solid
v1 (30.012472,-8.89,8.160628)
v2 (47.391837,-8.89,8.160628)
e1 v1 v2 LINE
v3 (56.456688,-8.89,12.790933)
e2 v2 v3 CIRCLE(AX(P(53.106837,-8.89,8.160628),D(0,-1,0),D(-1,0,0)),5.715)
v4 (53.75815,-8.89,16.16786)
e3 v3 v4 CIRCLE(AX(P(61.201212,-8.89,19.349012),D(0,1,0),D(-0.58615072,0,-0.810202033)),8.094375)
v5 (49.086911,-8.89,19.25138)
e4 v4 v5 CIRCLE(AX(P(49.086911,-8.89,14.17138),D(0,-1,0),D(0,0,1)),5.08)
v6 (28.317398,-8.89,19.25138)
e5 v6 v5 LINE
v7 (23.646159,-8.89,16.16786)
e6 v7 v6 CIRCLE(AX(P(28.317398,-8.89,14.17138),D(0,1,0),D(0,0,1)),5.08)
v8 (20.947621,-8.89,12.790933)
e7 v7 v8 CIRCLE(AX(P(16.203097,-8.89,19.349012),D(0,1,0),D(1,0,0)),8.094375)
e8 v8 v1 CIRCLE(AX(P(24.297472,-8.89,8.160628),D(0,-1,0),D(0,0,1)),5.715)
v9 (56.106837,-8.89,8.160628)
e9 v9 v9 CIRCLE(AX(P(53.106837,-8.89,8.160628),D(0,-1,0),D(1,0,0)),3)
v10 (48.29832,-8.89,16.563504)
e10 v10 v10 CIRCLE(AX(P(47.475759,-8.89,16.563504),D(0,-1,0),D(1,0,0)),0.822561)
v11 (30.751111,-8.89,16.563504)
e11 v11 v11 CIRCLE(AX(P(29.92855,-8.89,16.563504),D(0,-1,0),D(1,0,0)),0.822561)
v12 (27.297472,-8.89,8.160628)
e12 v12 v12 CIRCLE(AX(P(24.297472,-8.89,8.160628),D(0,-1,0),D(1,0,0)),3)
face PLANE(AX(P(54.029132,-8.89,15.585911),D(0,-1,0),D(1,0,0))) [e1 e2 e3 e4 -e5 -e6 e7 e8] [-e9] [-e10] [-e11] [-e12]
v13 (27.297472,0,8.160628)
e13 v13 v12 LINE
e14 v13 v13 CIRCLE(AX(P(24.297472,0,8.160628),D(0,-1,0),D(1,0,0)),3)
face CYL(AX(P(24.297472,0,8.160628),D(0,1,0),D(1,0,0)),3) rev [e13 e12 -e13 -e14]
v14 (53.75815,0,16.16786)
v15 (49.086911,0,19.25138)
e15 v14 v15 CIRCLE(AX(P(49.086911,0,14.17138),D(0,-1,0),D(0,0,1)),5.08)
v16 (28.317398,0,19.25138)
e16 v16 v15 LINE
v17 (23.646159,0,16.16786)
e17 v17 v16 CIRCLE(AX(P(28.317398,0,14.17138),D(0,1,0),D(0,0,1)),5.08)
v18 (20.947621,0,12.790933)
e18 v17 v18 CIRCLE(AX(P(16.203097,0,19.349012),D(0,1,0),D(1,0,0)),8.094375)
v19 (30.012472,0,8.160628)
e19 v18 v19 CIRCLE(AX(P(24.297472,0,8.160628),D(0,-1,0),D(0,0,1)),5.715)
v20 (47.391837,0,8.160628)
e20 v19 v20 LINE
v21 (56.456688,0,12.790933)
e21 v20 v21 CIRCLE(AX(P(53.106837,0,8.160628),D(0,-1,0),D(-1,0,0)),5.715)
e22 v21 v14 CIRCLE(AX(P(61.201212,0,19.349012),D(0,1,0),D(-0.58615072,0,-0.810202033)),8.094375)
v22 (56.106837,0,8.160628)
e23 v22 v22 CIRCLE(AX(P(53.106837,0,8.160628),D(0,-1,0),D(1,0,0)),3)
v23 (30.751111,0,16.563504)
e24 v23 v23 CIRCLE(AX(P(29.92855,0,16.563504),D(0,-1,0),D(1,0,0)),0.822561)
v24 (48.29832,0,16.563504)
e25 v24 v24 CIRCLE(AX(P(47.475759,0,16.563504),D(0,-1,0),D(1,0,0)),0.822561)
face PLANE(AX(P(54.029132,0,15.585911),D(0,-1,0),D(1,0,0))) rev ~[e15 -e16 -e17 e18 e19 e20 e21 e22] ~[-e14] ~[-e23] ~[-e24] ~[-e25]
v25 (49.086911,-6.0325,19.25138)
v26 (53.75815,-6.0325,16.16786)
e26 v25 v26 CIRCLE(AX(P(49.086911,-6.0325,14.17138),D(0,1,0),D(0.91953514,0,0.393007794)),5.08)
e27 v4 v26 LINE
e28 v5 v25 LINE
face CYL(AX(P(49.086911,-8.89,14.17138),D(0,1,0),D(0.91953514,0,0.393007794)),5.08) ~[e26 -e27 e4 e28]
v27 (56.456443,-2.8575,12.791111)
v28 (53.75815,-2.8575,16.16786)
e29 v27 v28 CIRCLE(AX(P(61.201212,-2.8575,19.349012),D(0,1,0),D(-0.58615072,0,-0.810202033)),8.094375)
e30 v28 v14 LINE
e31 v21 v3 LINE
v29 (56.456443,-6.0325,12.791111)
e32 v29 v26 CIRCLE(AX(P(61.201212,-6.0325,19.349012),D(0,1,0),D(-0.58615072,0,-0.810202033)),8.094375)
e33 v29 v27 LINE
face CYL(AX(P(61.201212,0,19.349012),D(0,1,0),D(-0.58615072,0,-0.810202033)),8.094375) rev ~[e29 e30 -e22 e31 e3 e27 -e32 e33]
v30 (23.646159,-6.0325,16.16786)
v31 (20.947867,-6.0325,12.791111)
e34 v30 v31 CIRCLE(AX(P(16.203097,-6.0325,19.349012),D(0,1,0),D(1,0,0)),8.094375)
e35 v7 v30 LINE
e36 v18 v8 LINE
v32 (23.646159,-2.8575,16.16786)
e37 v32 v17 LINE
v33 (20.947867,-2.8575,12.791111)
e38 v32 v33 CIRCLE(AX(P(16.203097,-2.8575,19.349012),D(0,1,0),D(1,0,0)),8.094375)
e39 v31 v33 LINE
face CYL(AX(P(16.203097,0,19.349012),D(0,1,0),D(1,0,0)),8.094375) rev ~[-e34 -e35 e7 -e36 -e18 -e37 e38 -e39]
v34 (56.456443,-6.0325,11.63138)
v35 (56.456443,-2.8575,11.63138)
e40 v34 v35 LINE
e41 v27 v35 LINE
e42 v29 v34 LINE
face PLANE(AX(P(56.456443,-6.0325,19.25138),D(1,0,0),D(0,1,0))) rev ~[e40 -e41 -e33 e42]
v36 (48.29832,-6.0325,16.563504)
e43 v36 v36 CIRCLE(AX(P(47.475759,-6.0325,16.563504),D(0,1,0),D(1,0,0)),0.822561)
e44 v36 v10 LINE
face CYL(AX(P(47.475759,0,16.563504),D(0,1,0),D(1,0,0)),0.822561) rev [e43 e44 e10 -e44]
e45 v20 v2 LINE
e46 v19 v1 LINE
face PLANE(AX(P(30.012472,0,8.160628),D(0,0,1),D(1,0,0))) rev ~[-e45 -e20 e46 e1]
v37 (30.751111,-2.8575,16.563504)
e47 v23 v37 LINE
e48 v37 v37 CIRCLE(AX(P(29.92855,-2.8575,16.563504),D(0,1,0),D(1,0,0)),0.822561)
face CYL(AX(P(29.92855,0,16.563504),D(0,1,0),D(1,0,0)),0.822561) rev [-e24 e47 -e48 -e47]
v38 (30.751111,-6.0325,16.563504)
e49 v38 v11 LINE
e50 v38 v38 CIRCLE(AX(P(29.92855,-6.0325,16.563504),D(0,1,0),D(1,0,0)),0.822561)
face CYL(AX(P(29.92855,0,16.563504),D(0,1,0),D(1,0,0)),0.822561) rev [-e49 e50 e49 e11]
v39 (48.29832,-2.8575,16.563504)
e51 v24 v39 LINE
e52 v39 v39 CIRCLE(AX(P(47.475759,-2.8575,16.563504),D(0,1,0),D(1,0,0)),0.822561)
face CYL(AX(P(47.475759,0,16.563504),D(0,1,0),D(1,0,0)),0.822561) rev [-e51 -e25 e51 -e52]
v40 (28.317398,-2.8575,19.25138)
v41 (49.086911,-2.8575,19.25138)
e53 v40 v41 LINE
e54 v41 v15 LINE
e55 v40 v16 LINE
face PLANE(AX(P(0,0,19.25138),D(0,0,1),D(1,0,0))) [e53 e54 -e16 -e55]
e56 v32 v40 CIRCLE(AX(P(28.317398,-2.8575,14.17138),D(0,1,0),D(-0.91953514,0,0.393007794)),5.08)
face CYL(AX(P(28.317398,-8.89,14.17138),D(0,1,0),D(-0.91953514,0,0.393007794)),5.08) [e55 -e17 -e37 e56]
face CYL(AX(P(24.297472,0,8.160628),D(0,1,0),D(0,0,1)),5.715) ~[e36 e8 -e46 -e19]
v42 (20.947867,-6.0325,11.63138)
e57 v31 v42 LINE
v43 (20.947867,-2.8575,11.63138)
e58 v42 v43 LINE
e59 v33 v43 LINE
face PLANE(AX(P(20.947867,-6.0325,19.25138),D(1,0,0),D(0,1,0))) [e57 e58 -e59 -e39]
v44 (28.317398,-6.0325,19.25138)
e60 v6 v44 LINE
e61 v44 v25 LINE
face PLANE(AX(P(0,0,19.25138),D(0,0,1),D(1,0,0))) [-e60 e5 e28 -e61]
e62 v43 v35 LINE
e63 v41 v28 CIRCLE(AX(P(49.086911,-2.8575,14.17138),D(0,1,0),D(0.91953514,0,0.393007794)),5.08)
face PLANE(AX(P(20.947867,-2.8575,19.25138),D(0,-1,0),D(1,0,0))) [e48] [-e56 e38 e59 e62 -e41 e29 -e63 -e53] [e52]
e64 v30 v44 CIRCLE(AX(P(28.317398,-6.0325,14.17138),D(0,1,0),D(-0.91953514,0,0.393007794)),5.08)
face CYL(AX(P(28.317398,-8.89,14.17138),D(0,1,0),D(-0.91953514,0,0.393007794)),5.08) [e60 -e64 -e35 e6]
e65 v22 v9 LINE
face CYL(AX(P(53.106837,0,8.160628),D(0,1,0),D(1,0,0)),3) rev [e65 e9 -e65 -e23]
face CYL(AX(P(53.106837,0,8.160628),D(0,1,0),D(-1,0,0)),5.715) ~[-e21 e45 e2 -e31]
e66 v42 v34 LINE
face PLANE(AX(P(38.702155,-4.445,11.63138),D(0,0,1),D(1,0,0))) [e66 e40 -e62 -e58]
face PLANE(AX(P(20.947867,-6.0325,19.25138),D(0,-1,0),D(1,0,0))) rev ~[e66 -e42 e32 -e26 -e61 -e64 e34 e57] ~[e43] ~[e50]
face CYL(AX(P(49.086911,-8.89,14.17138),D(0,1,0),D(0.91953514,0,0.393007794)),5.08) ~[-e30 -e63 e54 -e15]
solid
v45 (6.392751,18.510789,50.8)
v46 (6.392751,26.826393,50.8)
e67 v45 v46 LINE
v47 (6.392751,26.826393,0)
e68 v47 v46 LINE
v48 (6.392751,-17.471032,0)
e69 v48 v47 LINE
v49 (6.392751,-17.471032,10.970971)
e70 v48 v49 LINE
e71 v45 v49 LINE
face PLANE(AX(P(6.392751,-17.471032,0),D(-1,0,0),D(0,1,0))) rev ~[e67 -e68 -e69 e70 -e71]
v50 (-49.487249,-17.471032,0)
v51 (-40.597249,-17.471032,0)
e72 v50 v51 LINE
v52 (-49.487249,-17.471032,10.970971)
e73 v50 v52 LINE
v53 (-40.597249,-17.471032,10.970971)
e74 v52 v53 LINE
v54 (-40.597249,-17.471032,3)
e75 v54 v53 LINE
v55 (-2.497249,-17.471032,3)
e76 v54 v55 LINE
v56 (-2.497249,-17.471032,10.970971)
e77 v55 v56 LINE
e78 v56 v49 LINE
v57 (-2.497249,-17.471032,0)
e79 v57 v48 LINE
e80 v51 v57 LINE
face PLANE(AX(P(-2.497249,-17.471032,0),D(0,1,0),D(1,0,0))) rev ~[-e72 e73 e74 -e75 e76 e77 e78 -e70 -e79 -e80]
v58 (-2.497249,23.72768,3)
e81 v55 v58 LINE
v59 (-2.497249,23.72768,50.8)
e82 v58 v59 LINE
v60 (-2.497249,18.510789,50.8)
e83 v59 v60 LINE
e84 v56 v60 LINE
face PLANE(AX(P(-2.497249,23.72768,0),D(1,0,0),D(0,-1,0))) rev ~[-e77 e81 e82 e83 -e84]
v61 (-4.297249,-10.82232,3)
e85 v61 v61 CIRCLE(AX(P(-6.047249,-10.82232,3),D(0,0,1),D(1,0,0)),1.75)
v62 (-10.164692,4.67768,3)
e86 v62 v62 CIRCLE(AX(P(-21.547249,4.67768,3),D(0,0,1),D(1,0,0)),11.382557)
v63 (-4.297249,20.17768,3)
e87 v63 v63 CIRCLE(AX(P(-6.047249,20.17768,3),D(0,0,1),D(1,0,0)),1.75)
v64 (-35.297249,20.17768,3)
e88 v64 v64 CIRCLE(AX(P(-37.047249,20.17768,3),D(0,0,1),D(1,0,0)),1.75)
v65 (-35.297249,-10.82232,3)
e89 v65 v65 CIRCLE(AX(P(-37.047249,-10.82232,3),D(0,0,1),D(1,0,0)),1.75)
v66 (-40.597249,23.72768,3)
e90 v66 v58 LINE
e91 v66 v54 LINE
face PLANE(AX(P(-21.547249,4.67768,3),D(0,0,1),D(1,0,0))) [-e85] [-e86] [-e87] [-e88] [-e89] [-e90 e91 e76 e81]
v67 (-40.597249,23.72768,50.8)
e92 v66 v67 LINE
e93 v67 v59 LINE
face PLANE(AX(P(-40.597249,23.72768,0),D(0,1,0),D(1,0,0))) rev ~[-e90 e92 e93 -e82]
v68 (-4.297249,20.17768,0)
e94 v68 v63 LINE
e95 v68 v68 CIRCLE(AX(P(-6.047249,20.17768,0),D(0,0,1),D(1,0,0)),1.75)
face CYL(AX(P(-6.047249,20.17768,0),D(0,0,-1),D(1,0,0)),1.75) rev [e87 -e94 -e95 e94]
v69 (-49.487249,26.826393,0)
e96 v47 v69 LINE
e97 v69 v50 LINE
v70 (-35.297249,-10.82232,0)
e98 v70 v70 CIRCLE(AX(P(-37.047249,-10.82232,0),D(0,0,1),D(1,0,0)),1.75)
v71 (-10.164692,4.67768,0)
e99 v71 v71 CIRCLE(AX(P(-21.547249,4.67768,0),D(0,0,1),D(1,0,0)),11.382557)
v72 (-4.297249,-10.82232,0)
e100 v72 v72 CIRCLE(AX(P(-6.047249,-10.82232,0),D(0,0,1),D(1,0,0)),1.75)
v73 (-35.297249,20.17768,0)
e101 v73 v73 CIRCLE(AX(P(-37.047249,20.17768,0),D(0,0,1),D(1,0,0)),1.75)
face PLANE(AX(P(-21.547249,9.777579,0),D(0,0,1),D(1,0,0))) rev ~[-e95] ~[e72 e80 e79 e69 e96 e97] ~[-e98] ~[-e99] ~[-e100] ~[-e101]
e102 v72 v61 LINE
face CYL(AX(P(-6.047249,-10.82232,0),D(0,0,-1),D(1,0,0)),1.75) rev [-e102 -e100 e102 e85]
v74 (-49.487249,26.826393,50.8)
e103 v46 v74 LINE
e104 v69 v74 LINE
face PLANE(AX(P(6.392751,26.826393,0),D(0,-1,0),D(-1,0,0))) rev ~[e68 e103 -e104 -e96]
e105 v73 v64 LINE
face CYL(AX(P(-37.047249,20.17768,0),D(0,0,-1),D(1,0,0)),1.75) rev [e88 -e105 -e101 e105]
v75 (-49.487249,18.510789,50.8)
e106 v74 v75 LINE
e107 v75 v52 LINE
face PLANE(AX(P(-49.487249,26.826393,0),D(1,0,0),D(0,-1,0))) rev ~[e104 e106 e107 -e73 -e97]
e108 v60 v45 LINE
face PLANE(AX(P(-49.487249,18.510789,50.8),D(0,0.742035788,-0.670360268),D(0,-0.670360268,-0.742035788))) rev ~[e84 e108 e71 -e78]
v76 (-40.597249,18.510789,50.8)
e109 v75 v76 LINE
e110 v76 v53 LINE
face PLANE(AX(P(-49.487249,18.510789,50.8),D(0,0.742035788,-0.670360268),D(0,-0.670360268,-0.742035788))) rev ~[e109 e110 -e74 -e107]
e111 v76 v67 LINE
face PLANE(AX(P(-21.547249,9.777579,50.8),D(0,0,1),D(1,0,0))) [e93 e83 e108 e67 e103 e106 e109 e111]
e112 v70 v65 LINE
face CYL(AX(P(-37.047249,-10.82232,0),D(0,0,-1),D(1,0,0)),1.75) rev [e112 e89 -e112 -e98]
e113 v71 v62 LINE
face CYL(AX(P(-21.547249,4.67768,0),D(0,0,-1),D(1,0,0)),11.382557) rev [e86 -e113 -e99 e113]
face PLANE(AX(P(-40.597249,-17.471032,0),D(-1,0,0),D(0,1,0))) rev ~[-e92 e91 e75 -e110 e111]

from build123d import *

# Parameters (mm, degrees)
F0_W        = 38.1
F0_H        = 38.1
F0_R        = 1.75
F0_R_2      = 11.3825570241
F0_H_2      = 3.0987125382
F1_DEPTH    = 3
F2_DEPTH    = 50.8
F4_DEPTH    = 55.88
F5_R        = 3
F5_R_2      = 0.8225607068
F6_DEPTH    = 8.89
F7_T4_DEPTH = 8.89
F7_T9_DEPTH = 8.89
F8_R        = 5.08
F9_W        = 35.5085759405
F9_H        = 3.175
F10_DEPTH   = 7.62


# Not quite as in the source:
# - a fillet or chamfer that OpenCascade refuses, or shapes differently, is made with other operations: its cross-section is extruded or revolved along the edge and cut away or added


with BuildPart() as f1:
    # F0 (on Top) → F1 (new body)
    with BuildSketch(Plane.XY):
        with Locations((-21.547248587, 4.677680321)):
            Rectangle(F0_W, F0_H)
        with Locations((-37.047248587, -10.822319679)):
            Circle(F0_R, mode=Mode.SUBTRACT)
        with Locations((-6.047248587, -10.822319679)):
            Circle(F0_R, mode=Mode.SUBTRACT)
        with Locations((-37.047248587, 20.177680321)):
            Circle(F0_R, mode=Mode.SUBTRACT)
        with Locations((-21.547248587, 4.677680321)):
            Circle(F0_R_2, mode=Mode.SUBTRACT)
        with Locations((-6.047248587, 20.177680321)):
            Circle(F0_R, mode=Mode.SUBTRACT)
        with Locations((-21.547248587, -15.9216759481)):
            Rectangle(F0_W, F0_H_2)
    extrude(amount=F1_DEPTH)

    # F0 (on Top) → F2 (join)
    with BuildSketch(Plane.XY):
        Polygon((-2.497248587, 23.727680321), (-2.497248587, -14.372319679), (-2.497248587, -17.4710322171), (6.392751413, -17.4710322171), (6.392751413, 26.8263928592), (-49.487248587, 26.8263928592), (-49.487248587, -17.4710322171), (-40.597248587, -17.4710322171), (-40.597248587, -14.372319679), (-40.597248587, 23.727680321), align=None)
    extrude(amount=F2_DEPTH)

    # F3 (on face) → F4 (cut, through all)
    with BuildSketch(Plane(origin=(-49.487248587, 0, 0), x_dir=(0, -1, 0), z_dir=(-1, 0, 0))):
        Polygon((17.4710322171, 50.8), (-18.5107886791, 50.8), (17.4710322171, 10.9709706157), align=None)
    extrude(amount=-F4_DEPTH, mode=Mode.SUBTRACT)


with BuildPart() as f6:
    # F5 (on Front) → F6 (new body)
    with BuildSketch(Plane.XZ):
        with BuildLine():
            Line((24.2974720895, 19.2513801157), (24.2974720895, 13.8756283784))
            ThreePointArc((24.2974720895, 13.8756283784), (20.256356835, 4.1195131239), (30.0124720895, 8.1606283784))
            Line((30.0124720895, 8.1606283784), (47.3918369746, 8.1606283784))
            ThreePointArc((47.3918369746, 8.1606283784), (57.1479522291, 4.1195131239), (53.1068369746, 13.8756283784))
            Line((53.1068369746, 13.8756283784), (53.1068369746, 19.2513801157))
            Line((53.1068369746, 19.2513801157), (24.2974720895, 19.2513801157))
        make_face()
        with Locations((24.2974720895, 8.1606283784)):
            Circle(F5_R, mode=Mode.SUBTRACT)
        with Locations((53.1068369746, 8.1606283784)):
            Circle(F5_R, mode=Mode.SUBTRACT)
        with Locations((29.9285501242, 16.5635042471)):
            Circle(F5_R_2, mode=Mode.SUBTRACT)
        with Locations((47.47575894, 16.5635042471)):
            Circle(F5_R_2, mode=Mode.SUBTRACT)
    extrude(amount=F6_DEPTH)

    # F7: fillet of radius 8.0943752319 on 2 edges, made by hand


with BuildPart() as f7_tool2:
    # F7_s3 → F7_t4 (new body)
    with BuildSketch(Plane.XZ):
        with BuildLine():
            ThreePointArc((24.2974720895, 19.3490122608), (23.4115248028, 15.6669643315), (20.947620726, 12.790932995))
            ThreePointArc((20.947620726, 12.790932995), (22.536927555, 13.5976963329), (24.2974720895, 13.8756283784))
            Line((24.2974720895, 13.8756283784), (24.2974720895, 19.3490122608))
        make_face()
    extrude(amount=F7_T4_DEPTH)

    split(bisect_by=Plane.XY.offset(19.2513801157), keep=Keep.BOTTOM)


with BuildPart() as f6_1:
    add(f6.part)

    # F7_t1: union F7_tool2
    add(f7_tool2.part)


with BuildPart() as f7_tool7:
    # F7_s8 → F7_t9 (new body)
    with BuildSketch(Plane.XZ):
        with BuildLine():
            ThreePointArc((56.4566883382, 12.790932995), (53.9927842613, 15.6669643315), (53.1068369746, 19.3490122608))
            Line((53.1068369746, 19.3490122608), (53.1068369746, 13.8756283784))
            ThreePointArc((53.1068369746, 13.8756283784), (54.8673815092, 13.5976963329), (56.4566883382, 12.790932995))
        make_face()
    extrude(amount=F7_T9_DEPTH)

    split(bisect_by=Plane.XY.offset(19.2513801157), keep=Keep.BOTTOM)


with BuildPart() as f6_2:
    add(f6_1.part)

    # F7_t6: union F7_tool7
    add(f7_tool7.part)

    # F8
    f8_edges = [f6_2.edges().sort_by_distance(p)[0] for p in [
        (24.296883, -4.445, 19.25138),
        (53.107426, -4.445, 19.25138),
    ]]
    fillet(f8_edges, radius=F8_R)

    # F9 (on face) → F10 (cut)
    with BuildSketch(Plane.XY.offset(19.2513801157)):
        with Locations((38.7021545321, -4.445)):
            Rectangle(F9_W, F9_H)
    extrude(amount=-F10_DEPTH, mode=Mode.SUBTRACT)


solid = Compound([f1.part, f6_2.part])
